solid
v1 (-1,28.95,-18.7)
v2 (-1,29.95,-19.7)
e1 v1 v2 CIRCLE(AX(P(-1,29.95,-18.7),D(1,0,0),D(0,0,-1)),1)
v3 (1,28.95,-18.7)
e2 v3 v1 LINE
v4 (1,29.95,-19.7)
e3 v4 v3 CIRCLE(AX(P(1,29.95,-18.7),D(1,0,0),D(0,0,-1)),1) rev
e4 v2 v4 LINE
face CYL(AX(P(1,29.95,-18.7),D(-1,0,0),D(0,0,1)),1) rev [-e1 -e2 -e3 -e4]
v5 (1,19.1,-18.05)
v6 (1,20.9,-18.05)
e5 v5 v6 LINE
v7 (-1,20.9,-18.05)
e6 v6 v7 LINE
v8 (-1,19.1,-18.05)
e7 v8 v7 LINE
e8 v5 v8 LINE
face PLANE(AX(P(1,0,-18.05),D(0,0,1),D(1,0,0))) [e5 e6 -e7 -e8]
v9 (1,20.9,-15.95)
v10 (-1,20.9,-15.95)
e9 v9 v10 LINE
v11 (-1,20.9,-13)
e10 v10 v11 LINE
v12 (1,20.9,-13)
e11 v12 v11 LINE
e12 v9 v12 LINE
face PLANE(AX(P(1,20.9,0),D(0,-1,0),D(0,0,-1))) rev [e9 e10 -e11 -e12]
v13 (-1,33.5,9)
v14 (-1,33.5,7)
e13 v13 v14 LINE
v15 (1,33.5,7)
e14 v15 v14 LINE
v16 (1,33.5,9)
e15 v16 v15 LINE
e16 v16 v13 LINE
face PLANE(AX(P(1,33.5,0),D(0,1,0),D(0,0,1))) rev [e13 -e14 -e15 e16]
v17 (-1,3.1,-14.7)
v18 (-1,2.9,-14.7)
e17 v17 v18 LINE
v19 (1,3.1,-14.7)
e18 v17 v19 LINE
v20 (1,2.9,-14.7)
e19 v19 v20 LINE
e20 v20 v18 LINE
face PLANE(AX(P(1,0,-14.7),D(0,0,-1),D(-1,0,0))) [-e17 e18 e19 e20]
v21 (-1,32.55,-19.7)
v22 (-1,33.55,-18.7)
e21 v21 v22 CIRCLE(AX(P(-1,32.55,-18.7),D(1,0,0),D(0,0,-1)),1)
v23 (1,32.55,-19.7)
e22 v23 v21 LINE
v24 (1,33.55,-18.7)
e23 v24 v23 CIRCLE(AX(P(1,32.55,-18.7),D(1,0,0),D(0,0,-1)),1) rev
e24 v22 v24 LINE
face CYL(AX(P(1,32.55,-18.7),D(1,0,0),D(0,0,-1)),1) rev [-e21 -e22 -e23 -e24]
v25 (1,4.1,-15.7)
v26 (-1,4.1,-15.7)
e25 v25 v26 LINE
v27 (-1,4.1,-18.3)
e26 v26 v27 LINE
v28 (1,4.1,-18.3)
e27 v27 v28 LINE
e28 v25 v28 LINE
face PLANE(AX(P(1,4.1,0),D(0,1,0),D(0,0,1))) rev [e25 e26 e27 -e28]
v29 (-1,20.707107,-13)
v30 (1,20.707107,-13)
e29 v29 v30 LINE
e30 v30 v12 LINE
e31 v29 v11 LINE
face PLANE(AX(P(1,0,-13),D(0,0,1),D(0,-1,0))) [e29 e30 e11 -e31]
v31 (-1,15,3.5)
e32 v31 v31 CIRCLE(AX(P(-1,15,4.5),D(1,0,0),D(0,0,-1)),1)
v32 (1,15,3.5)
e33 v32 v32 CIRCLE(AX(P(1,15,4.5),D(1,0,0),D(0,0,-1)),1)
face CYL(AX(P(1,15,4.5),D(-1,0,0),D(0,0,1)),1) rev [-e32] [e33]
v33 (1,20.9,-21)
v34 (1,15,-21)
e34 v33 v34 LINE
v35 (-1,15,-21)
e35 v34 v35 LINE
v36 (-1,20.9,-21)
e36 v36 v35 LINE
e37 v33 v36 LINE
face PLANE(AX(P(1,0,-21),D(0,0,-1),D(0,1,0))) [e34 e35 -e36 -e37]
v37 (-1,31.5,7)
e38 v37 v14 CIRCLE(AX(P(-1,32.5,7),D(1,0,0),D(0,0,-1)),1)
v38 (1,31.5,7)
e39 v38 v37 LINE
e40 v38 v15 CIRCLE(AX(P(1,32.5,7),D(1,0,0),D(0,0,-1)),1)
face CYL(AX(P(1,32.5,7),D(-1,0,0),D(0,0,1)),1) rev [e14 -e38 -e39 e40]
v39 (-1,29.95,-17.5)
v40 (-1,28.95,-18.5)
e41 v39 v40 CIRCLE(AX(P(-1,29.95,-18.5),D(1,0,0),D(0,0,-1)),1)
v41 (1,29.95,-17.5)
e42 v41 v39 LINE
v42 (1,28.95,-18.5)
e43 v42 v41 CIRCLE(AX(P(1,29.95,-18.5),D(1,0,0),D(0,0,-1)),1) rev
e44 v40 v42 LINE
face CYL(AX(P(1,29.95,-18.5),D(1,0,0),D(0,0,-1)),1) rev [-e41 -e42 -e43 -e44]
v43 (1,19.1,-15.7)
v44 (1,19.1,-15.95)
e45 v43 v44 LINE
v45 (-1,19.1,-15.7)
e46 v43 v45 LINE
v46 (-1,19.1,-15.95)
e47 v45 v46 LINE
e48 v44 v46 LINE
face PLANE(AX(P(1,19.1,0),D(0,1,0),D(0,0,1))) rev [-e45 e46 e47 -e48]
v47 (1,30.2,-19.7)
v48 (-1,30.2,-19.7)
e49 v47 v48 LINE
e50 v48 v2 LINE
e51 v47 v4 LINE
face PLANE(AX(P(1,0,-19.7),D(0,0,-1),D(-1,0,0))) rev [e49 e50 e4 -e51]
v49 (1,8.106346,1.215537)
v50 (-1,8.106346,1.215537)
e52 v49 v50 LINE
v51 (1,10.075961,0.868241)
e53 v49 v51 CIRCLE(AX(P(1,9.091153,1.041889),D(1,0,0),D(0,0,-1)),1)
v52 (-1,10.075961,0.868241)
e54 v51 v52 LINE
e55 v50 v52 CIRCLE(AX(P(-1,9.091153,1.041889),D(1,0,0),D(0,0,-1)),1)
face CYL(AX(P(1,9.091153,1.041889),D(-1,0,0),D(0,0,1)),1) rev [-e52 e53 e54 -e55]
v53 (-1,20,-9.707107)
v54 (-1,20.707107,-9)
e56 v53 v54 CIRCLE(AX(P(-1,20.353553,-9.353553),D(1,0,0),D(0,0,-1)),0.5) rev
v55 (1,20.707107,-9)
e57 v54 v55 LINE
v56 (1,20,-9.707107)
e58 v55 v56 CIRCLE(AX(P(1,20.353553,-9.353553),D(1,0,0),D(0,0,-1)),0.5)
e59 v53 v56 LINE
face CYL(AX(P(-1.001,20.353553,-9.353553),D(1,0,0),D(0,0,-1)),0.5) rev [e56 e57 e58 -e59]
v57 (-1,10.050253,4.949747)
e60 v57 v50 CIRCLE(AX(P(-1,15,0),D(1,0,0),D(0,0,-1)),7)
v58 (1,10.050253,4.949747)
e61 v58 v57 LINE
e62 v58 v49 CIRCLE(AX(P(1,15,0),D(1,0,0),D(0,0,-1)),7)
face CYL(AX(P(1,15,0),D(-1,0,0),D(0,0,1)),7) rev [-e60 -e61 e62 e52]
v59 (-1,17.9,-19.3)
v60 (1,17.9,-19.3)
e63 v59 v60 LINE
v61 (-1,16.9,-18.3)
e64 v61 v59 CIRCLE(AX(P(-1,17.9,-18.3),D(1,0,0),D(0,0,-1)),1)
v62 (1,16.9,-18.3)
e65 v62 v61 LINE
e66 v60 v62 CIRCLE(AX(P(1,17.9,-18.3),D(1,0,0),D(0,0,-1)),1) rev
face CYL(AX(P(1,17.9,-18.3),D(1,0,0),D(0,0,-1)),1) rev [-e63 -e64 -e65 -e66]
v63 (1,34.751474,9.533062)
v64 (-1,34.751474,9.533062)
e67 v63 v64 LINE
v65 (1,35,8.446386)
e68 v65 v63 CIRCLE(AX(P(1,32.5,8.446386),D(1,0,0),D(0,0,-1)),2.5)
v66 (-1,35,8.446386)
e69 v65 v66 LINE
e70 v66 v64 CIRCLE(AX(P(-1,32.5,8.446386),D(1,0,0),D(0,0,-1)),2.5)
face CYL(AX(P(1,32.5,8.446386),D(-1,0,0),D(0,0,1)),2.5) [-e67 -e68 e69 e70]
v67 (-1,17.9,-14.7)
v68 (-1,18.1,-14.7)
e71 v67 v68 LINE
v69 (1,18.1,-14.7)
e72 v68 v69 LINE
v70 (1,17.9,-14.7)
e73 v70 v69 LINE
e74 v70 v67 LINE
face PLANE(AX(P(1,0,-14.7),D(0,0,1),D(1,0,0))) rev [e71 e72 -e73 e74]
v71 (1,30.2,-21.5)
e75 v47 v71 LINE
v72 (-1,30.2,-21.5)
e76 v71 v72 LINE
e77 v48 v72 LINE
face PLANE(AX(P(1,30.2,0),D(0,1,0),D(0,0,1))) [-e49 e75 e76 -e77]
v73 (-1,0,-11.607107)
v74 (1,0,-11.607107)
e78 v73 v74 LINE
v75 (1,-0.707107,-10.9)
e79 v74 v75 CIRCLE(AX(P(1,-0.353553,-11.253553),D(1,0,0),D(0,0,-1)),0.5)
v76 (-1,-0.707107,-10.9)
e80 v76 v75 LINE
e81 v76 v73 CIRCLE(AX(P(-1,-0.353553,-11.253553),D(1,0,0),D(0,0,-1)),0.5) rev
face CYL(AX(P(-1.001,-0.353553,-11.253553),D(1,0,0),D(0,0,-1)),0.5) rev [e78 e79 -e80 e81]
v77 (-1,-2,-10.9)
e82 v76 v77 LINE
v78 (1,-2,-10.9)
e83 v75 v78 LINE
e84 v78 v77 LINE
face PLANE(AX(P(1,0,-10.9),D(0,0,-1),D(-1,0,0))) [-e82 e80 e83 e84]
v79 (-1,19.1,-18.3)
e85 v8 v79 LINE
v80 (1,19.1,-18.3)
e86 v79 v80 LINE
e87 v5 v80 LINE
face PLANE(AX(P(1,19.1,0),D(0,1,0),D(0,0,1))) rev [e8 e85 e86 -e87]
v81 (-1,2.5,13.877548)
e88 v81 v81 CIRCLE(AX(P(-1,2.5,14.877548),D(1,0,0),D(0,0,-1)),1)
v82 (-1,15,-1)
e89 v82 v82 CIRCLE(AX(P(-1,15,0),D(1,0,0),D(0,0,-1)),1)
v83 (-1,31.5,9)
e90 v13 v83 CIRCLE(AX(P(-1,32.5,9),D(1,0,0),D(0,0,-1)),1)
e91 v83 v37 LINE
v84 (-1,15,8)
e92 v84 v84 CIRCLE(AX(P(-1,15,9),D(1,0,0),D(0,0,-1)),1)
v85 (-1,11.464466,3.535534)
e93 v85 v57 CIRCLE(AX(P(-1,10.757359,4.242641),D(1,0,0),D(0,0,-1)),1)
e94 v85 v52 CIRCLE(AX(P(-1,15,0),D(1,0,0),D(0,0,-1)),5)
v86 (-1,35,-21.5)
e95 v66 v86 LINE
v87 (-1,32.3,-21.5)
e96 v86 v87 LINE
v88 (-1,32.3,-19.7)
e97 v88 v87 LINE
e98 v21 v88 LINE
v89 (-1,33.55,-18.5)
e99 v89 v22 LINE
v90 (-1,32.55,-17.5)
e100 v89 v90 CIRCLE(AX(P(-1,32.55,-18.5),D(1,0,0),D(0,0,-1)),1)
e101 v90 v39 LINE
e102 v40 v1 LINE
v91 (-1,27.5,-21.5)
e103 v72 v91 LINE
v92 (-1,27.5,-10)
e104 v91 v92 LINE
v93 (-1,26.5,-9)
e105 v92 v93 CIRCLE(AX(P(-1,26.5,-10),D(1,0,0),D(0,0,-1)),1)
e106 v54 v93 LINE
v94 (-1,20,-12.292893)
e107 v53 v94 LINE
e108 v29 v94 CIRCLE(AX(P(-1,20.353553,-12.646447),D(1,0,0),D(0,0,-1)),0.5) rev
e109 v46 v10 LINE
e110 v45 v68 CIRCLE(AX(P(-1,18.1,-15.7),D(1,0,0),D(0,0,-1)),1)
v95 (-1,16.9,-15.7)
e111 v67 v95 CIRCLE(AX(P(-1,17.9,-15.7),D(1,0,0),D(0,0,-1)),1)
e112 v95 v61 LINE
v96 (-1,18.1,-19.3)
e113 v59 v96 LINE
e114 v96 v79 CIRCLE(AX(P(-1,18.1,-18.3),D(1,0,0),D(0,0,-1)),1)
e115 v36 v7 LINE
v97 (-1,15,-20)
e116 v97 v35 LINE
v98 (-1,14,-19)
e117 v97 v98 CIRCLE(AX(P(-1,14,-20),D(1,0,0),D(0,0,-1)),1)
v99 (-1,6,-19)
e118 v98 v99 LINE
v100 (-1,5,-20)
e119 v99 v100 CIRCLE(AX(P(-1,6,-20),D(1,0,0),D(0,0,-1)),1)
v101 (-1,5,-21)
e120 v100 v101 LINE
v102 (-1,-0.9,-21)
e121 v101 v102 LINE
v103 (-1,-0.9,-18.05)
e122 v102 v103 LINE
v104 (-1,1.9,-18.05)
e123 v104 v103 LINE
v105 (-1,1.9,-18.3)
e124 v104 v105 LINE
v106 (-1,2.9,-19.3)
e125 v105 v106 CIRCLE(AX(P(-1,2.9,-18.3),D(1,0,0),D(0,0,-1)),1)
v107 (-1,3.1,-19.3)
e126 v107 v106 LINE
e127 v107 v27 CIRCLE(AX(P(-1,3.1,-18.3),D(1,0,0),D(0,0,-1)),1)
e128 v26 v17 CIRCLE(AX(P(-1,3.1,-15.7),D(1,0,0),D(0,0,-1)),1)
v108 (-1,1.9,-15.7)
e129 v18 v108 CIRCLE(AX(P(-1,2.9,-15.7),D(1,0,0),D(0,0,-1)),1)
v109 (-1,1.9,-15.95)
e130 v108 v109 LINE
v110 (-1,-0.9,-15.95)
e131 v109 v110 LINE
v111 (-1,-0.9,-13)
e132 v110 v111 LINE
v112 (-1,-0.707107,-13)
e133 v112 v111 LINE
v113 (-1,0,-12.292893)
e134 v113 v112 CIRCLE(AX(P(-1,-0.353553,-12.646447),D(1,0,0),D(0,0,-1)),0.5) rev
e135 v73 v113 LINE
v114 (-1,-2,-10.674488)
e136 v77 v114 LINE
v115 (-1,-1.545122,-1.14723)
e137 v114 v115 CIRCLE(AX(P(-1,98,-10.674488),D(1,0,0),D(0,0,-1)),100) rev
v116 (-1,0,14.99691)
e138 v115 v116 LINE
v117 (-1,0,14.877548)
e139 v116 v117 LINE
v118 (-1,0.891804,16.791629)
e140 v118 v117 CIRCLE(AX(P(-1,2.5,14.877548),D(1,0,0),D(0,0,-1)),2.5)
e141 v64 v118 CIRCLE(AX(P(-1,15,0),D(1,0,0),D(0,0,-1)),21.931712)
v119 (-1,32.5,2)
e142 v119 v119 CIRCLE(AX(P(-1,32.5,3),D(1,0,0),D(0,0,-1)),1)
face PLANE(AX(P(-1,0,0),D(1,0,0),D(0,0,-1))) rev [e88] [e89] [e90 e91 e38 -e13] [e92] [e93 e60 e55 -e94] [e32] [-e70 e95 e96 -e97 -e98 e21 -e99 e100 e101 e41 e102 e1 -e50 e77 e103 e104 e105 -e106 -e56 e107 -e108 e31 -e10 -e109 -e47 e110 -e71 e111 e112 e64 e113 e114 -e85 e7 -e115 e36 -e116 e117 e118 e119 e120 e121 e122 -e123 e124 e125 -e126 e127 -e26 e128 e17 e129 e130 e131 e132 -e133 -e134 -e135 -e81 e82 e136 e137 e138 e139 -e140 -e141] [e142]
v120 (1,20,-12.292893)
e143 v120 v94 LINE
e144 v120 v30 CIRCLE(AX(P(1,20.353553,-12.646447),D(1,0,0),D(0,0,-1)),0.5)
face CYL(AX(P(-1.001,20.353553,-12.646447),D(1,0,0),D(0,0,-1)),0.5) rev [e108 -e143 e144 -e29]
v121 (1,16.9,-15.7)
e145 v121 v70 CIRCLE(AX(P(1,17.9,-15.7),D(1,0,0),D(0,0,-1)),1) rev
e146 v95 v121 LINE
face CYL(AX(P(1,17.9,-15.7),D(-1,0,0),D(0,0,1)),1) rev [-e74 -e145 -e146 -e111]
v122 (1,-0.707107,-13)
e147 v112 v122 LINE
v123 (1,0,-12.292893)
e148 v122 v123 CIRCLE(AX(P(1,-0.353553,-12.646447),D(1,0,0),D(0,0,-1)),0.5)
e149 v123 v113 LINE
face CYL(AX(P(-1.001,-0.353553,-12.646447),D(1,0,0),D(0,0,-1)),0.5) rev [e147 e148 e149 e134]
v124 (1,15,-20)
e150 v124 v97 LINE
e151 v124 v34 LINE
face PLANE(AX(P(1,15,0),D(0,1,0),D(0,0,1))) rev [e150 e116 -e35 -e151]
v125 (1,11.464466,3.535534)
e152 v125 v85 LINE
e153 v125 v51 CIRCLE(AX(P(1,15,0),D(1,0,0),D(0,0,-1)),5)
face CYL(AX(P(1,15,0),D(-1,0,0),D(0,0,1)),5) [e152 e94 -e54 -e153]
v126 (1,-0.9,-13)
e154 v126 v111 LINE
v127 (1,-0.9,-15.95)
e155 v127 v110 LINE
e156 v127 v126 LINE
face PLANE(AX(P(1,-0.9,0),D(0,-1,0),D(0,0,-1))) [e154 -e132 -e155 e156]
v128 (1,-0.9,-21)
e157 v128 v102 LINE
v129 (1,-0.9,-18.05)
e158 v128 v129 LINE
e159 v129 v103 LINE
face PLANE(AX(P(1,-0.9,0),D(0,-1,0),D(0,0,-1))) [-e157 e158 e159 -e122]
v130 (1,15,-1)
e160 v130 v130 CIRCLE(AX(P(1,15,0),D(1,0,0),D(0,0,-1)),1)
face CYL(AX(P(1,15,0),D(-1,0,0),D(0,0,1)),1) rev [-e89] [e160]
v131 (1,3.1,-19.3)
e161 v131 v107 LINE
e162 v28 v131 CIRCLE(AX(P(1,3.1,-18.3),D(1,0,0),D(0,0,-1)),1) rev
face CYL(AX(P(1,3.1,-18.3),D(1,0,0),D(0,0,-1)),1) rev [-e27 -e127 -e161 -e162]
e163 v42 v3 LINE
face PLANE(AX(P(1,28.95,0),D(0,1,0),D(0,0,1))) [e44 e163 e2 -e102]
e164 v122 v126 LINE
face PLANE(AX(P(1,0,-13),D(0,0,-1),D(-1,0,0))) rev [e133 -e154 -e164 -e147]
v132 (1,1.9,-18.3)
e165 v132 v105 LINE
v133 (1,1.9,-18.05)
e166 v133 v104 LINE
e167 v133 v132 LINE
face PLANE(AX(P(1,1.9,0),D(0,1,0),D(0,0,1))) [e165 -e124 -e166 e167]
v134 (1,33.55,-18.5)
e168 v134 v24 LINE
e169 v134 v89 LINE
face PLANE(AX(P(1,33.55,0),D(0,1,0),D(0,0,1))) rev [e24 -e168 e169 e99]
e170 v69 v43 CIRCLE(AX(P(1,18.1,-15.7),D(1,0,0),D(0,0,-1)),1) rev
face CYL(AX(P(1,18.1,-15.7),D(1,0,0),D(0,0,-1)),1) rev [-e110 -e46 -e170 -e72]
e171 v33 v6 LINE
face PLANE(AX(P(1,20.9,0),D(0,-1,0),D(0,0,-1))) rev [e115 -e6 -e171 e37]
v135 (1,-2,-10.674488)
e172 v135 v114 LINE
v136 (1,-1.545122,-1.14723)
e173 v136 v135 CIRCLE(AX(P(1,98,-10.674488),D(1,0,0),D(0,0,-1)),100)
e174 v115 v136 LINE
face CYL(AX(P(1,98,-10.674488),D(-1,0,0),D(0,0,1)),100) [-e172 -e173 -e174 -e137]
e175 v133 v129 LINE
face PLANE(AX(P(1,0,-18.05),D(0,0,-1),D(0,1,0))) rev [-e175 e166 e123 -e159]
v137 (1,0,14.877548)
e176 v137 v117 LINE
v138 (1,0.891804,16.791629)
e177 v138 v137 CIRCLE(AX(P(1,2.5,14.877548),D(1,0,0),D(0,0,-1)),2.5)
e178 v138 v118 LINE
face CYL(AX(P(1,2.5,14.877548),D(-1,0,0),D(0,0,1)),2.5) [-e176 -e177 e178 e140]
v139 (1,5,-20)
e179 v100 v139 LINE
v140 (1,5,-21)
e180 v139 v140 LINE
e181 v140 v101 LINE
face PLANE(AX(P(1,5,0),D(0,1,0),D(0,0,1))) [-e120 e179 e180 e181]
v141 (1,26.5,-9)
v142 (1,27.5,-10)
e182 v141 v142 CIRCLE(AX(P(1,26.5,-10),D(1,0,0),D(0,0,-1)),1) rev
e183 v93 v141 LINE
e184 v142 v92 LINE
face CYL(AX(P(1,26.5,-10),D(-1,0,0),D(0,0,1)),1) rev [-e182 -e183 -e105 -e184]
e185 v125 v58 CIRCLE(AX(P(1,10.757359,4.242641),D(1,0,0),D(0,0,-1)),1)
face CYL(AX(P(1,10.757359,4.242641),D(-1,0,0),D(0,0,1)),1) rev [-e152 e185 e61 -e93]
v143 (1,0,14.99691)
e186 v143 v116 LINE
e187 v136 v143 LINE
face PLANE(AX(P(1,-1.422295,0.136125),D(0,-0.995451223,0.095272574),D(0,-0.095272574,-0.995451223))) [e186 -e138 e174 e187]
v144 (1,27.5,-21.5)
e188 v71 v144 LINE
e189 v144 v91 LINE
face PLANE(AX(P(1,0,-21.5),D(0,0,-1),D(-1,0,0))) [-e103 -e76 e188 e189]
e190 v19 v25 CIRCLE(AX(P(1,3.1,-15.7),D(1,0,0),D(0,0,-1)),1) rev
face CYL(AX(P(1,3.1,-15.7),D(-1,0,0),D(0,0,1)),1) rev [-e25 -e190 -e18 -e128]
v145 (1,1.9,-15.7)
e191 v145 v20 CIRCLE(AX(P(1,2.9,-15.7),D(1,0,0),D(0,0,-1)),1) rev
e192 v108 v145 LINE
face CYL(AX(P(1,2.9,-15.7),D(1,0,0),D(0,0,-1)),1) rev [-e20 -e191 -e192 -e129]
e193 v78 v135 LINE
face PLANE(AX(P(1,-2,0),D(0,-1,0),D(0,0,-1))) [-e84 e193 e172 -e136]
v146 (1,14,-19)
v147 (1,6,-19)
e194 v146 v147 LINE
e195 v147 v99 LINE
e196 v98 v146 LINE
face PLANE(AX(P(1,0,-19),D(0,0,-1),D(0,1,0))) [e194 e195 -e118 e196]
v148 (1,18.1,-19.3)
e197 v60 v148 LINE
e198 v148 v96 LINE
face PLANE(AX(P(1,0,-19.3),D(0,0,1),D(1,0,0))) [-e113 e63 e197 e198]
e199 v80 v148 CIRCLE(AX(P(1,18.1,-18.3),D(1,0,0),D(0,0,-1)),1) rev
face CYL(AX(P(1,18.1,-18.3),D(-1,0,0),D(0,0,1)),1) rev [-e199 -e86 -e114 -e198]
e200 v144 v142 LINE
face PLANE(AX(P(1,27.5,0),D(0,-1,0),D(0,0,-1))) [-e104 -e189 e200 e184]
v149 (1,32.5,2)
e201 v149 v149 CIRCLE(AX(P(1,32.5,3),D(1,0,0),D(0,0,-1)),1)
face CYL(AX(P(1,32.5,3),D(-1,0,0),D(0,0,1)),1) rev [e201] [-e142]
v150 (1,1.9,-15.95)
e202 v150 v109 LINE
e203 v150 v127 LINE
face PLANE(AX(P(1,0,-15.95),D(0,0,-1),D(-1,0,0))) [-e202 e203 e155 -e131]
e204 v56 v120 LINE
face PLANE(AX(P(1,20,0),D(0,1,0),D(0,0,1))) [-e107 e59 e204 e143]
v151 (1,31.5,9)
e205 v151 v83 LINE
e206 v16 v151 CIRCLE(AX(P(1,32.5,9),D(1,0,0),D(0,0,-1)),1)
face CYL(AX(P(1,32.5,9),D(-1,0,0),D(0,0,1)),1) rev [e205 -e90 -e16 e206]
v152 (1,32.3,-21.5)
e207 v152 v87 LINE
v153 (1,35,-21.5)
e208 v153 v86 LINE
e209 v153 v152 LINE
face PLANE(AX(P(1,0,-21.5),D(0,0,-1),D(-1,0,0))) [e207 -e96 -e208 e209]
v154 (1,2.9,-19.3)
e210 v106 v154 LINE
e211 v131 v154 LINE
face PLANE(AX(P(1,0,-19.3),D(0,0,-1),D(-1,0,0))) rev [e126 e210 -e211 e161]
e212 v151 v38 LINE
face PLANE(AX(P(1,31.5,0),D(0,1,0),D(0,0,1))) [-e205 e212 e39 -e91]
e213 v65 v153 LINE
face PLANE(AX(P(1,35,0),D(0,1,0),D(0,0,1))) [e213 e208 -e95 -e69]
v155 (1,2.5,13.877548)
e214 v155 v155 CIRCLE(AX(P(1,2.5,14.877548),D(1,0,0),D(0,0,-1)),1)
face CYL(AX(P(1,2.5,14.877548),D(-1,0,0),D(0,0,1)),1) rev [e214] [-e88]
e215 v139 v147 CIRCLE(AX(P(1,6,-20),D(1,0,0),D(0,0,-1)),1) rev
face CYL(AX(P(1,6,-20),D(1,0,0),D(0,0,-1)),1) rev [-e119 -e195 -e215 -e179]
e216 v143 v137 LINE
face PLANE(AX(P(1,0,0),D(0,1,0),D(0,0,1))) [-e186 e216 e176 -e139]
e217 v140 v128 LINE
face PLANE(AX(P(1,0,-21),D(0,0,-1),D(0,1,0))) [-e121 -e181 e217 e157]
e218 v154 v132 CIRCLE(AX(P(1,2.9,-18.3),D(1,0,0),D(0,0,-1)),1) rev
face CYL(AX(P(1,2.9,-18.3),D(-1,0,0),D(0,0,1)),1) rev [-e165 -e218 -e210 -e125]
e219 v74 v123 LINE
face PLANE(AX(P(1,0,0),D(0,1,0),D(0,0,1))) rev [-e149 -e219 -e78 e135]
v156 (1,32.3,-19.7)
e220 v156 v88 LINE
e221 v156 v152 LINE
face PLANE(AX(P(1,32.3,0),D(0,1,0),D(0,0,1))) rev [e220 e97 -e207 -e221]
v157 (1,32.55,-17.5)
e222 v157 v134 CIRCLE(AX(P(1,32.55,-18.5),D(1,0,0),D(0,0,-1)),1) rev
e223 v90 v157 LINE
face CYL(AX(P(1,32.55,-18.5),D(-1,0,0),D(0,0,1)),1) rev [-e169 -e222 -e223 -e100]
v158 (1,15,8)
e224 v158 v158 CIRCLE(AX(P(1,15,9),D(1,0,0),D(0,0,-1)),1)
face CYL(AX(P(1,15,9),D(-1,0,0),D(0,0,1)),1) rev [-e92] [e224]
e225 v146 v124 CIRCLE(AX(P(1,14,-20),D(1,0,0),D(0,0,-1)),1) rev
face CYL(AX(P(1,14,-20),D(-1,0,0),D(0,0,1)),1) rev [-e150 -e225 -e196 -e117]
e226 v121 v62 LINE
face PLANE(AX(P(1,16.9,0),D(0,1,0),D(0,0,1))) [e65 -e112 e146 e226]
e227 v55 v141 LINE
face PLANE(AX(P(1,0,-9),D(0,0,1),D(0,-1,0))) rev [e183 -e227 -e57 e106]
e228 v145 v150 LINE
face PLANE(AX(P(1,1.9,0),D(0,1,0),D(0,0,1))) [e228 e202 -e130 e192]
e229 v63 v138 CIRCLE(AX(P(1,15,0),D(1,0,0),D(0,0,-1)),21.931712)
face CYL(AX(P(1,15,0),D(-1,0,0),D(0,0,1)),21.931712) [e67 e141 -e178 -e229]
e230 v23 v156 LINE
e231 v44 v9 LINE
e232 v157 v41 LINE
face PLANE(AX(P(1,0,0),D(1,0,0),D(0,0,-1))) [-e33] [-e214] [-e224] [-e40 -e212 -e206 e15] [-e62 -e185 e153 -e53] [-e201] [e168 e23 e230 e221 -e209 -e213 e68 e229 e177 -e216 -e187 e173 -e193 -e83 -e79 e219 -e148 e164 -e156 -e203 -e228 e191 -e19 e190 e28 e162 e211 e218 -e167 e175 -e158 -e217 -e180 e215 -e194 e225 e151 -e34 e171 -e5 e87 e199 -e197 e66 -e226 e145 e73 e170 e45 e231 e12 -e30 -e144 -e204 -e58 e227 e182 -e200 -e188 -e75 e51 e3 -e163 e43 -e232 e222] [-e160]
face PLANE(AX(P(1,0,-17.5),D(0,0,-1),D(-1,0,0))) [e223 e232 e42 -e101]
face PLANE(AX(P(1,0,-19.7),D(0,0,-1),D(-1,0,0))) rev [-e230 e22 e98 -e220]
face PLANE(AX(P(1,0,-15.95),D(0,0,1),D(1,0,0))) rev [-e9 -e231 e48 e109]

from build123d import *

# Parameters (mm, degrees)
SKETCH1_R           = 1
BASE_SHAPE_DEPTH    = 1
BOTTOM_FILLET_R     = 100
MILLING_FILLETS_R   = 1
MILL_START          = -2
SKETCH17_R          = 0.5
MILL_CUTS_1MM_DEPTH = 2


with BuildPart() as part:
    # Sketch1 → Base shape (new, symmetric)
    with BuildSketch(Plane(origin=(0, 0, 0), x_dir=(0, 0, -1), z_dir=(1, 0, 0))):
        with BuildLine():
            Line((13, 20), (9, 20))
            Line((9, 20), (9, 27.5))
            Line((9, 27.5), (21.5, 27.5))
            Line((21.5, 27.5), (21.5, 30.2))
            Line((21.5, 30.2), (19.7, 30.2))
            Line((19.7, 30.2), (19.7, 28.95))
            Line((19.7, 28.95), (17.5, 28.95))
            Line((17.5, 28.95), (17.5, 33.55))
            Line((17.5, 33.55), (19.7, 33.55))
            Line((19.7, 33.55), (19.7, 32.3))
            Line((19.7, 32.3), (21.5, 32.3))
            Line((21.5, 32.3), (21.5, 35))
            Line((21.5, 35), (-8.44638615, 35))
            ThreePointArc((-8.44638615, 35), (-9.003752396, 34.937076705), (-9.533061586, 34.751474294))
            ThreePointArc((-9.533061586, 34.751474294), (-21.444501682, 19.597102087), (-16.791629001, 0.891803961))
            ThreePointArc((-16.791629001, 0.891803961), (-15.933367715, 0.233892092), (-14.877548152, 0))
            Line((-14.877548152, 0), (-14.996910346, 0))
            Line((-14.996910346, 0), (5.9, -2))
            Line((5.9, -2), (10.9, -2))
            Line((10.9, -2), (10.9, 0))
            Line((10.9, 0), (13, 0))
            Line((13, 0), (13, -0.9))
            Line((13, -0.9), (15.95, -0.9))
            Line((15.95, -0.9), (15.95, 1.9))
            Line((15.95, 1.9), (14.7, 1.9))
            Line((14.7, 1.9), (14.7, 4.1))
            Line((14.7, 4.1), (19.3, 4.1))
            Line((19.3, 4.1), (19.3, 1.9))
            Line((19.3, 1.9), (18.05, 1.9))
            Line((18.05, 1.9), (18.05, -0.9))
            Line((18.05, -0.9), (21, -0.9))
            Line((21, -0.9), (21, 5))
            Line((21, 5), (19, 5))
            Line((19, 5), (19, 15))
            Line((19, 15), (21, 15))
            Line((21, 15), (21, 20.9))
            Line((21, 20.9), (18.05, 20.9))
            Line((18.05, 20.9), (18.05, 19.1))
            Line((18.05, 19.1), (19.3, 19.1))
            Line((19.3, 19.1), (19.3, 16.9))
            Line((19.3, 16.9), (14.7, 16.9))
            Line((14.7, 16.9), (14.7, 19.1))
            Line((14.7, 19.1), (15.95, 19.1))
            Line((15.95, 19.1), (15.95, 20.9))
            Line((15.95, 20.9), (13, 20.9))
            Line((13, 20.9), (13, 20))
        make_face()
        with BuildLine():
            ThreePointArc((-0.868240859, 10.07596123), (-0.05708131, 8.91750532), (-1.215537181, 8.106345718))
            ThreePointArc((-1.215537181, 8.106345718), (-3.232240261, 8.790924151), (-4.949747462, 10.050252526))
            ThreePointArc((-4.949747462, 10.050252526), (-4.949747471, 11.464466091), (-3.535533905, 11.464466093))
            ThreePointArc((-3.535533905, 11.464466093), (-2.308743052, 10.564945827), (-0.868240859, 10.07596123))
        make_face(mode=Mode.SUBTRACT)
        with Locations((-4.5, 15)):
            Circle(SKETCH1_R, mode=Mode.SUBTRACT)
        with Locations((-9, 15)):
            Circle(SKETCH1_R, mode=Mode.SUBTRACT)
        with Locations((-3, 32.5)):
            Circle(SKETCH1_R, mode=Mode.SUBTRACT)
        with Locations((0, 15)):
            Circle(SKETCH1_R, mode=Mode.SUBTRACT)
        with Locations((-14.877548152, 2.5)):
            Circle(SKETCH1_R, mode=Mode.SUBTRACT)
        with BuildLine():
            Line((-9, 33.5), (-7, 33.5))
            ThreePointArc((-7, 33.5), (-6, 32.5), (-7, 31.5))
            Line((-7, 31.5), (-9, 31.5))
            ThreePointArc((-9, 31.5), (-10, 32.5), (-9, 33.5))
        make_face(mode=Mode.SUBTRACT)
    extrude(amount=BASE_SHAPE_DEPTH, both=True)

    # Bottom fillet
    # the kernel refuses this fillet: 100 mm, written as the material it takes off along each edge
    with BuildSketch(Plane(origin=(-12.9362194, -2, -5.9), x_dir=(0, 0, -1), z_dir=(1, 0, 0))) as bottom_fillet_piece_1:
        with BuildLine():
            CenterArc((BOTTOM_FILLET_R * 0.0477448775998, BOTTOM_FILLET_R), BOTTOM_FILLET_R, 264.532991667, 5.467008333)
            Line((-BOTTOM_FILLET_R * 0.0475276967795, BOTTOM_FILLET_R * 0.00454877740235), (0, 0))
            Line((0, 0), (BOTTOM_FILLET_R * 0.0477448775998, 0))
        make_face()
    extrude(amount=25.8724388, mode=Mode.SUBTRACT)

    # Milling fillets
    milling_fillets_edges = [part.edges().sort_by_distance(p)[0] for p in [
        (0, 33.55, -19.7),
        (0, 33.55, -17.5),
        (0, 28.95, -17.5),
        (0, 28.95, -19.7),
        (0, 27.5, -9),
        (0, 19.1, -14.7),
        (0, 16.9, -14.7),
        (0, 16.9, -19.3),
        (0, 19.1, -19.3),
        (0, 15, -19),
        (0, 5, -19),
        (0, 1.9, -19.3),
        (0, 4.1, -19.3),
        (0, 4.1, -14.7),
        (0, 1.9, -14.7),
    ]]
    fillet(milling_fillets_edges, radius=MILLING_FILLETS_R)

    # Sketch17 → Mill cuts 1mm (cut)
    with BuildSketch(Plane(origin=(1, 0, 0), x_dir=(0, 0, -1), z_dir=(1, 0, 0)).offset(MILL_START)):
        with Locations((9.353553391, 20.353553391)):
            Circle(SKETCH17_R)
        with Locations((12.646446609, 20.353553391)):
            Circle(SKETCH17_R)
        with Locations((12.646446609, -0.353553391)):
            Circle(SKETCH17_R)
        with Locations((11.253553391, -0.353553391)):
            Circle(SKETCH17_R)
    extrude(amount=MILL_CUTS_1MM_DEPTH, mode=Mode.SUBTRACT)


solid = part.part
